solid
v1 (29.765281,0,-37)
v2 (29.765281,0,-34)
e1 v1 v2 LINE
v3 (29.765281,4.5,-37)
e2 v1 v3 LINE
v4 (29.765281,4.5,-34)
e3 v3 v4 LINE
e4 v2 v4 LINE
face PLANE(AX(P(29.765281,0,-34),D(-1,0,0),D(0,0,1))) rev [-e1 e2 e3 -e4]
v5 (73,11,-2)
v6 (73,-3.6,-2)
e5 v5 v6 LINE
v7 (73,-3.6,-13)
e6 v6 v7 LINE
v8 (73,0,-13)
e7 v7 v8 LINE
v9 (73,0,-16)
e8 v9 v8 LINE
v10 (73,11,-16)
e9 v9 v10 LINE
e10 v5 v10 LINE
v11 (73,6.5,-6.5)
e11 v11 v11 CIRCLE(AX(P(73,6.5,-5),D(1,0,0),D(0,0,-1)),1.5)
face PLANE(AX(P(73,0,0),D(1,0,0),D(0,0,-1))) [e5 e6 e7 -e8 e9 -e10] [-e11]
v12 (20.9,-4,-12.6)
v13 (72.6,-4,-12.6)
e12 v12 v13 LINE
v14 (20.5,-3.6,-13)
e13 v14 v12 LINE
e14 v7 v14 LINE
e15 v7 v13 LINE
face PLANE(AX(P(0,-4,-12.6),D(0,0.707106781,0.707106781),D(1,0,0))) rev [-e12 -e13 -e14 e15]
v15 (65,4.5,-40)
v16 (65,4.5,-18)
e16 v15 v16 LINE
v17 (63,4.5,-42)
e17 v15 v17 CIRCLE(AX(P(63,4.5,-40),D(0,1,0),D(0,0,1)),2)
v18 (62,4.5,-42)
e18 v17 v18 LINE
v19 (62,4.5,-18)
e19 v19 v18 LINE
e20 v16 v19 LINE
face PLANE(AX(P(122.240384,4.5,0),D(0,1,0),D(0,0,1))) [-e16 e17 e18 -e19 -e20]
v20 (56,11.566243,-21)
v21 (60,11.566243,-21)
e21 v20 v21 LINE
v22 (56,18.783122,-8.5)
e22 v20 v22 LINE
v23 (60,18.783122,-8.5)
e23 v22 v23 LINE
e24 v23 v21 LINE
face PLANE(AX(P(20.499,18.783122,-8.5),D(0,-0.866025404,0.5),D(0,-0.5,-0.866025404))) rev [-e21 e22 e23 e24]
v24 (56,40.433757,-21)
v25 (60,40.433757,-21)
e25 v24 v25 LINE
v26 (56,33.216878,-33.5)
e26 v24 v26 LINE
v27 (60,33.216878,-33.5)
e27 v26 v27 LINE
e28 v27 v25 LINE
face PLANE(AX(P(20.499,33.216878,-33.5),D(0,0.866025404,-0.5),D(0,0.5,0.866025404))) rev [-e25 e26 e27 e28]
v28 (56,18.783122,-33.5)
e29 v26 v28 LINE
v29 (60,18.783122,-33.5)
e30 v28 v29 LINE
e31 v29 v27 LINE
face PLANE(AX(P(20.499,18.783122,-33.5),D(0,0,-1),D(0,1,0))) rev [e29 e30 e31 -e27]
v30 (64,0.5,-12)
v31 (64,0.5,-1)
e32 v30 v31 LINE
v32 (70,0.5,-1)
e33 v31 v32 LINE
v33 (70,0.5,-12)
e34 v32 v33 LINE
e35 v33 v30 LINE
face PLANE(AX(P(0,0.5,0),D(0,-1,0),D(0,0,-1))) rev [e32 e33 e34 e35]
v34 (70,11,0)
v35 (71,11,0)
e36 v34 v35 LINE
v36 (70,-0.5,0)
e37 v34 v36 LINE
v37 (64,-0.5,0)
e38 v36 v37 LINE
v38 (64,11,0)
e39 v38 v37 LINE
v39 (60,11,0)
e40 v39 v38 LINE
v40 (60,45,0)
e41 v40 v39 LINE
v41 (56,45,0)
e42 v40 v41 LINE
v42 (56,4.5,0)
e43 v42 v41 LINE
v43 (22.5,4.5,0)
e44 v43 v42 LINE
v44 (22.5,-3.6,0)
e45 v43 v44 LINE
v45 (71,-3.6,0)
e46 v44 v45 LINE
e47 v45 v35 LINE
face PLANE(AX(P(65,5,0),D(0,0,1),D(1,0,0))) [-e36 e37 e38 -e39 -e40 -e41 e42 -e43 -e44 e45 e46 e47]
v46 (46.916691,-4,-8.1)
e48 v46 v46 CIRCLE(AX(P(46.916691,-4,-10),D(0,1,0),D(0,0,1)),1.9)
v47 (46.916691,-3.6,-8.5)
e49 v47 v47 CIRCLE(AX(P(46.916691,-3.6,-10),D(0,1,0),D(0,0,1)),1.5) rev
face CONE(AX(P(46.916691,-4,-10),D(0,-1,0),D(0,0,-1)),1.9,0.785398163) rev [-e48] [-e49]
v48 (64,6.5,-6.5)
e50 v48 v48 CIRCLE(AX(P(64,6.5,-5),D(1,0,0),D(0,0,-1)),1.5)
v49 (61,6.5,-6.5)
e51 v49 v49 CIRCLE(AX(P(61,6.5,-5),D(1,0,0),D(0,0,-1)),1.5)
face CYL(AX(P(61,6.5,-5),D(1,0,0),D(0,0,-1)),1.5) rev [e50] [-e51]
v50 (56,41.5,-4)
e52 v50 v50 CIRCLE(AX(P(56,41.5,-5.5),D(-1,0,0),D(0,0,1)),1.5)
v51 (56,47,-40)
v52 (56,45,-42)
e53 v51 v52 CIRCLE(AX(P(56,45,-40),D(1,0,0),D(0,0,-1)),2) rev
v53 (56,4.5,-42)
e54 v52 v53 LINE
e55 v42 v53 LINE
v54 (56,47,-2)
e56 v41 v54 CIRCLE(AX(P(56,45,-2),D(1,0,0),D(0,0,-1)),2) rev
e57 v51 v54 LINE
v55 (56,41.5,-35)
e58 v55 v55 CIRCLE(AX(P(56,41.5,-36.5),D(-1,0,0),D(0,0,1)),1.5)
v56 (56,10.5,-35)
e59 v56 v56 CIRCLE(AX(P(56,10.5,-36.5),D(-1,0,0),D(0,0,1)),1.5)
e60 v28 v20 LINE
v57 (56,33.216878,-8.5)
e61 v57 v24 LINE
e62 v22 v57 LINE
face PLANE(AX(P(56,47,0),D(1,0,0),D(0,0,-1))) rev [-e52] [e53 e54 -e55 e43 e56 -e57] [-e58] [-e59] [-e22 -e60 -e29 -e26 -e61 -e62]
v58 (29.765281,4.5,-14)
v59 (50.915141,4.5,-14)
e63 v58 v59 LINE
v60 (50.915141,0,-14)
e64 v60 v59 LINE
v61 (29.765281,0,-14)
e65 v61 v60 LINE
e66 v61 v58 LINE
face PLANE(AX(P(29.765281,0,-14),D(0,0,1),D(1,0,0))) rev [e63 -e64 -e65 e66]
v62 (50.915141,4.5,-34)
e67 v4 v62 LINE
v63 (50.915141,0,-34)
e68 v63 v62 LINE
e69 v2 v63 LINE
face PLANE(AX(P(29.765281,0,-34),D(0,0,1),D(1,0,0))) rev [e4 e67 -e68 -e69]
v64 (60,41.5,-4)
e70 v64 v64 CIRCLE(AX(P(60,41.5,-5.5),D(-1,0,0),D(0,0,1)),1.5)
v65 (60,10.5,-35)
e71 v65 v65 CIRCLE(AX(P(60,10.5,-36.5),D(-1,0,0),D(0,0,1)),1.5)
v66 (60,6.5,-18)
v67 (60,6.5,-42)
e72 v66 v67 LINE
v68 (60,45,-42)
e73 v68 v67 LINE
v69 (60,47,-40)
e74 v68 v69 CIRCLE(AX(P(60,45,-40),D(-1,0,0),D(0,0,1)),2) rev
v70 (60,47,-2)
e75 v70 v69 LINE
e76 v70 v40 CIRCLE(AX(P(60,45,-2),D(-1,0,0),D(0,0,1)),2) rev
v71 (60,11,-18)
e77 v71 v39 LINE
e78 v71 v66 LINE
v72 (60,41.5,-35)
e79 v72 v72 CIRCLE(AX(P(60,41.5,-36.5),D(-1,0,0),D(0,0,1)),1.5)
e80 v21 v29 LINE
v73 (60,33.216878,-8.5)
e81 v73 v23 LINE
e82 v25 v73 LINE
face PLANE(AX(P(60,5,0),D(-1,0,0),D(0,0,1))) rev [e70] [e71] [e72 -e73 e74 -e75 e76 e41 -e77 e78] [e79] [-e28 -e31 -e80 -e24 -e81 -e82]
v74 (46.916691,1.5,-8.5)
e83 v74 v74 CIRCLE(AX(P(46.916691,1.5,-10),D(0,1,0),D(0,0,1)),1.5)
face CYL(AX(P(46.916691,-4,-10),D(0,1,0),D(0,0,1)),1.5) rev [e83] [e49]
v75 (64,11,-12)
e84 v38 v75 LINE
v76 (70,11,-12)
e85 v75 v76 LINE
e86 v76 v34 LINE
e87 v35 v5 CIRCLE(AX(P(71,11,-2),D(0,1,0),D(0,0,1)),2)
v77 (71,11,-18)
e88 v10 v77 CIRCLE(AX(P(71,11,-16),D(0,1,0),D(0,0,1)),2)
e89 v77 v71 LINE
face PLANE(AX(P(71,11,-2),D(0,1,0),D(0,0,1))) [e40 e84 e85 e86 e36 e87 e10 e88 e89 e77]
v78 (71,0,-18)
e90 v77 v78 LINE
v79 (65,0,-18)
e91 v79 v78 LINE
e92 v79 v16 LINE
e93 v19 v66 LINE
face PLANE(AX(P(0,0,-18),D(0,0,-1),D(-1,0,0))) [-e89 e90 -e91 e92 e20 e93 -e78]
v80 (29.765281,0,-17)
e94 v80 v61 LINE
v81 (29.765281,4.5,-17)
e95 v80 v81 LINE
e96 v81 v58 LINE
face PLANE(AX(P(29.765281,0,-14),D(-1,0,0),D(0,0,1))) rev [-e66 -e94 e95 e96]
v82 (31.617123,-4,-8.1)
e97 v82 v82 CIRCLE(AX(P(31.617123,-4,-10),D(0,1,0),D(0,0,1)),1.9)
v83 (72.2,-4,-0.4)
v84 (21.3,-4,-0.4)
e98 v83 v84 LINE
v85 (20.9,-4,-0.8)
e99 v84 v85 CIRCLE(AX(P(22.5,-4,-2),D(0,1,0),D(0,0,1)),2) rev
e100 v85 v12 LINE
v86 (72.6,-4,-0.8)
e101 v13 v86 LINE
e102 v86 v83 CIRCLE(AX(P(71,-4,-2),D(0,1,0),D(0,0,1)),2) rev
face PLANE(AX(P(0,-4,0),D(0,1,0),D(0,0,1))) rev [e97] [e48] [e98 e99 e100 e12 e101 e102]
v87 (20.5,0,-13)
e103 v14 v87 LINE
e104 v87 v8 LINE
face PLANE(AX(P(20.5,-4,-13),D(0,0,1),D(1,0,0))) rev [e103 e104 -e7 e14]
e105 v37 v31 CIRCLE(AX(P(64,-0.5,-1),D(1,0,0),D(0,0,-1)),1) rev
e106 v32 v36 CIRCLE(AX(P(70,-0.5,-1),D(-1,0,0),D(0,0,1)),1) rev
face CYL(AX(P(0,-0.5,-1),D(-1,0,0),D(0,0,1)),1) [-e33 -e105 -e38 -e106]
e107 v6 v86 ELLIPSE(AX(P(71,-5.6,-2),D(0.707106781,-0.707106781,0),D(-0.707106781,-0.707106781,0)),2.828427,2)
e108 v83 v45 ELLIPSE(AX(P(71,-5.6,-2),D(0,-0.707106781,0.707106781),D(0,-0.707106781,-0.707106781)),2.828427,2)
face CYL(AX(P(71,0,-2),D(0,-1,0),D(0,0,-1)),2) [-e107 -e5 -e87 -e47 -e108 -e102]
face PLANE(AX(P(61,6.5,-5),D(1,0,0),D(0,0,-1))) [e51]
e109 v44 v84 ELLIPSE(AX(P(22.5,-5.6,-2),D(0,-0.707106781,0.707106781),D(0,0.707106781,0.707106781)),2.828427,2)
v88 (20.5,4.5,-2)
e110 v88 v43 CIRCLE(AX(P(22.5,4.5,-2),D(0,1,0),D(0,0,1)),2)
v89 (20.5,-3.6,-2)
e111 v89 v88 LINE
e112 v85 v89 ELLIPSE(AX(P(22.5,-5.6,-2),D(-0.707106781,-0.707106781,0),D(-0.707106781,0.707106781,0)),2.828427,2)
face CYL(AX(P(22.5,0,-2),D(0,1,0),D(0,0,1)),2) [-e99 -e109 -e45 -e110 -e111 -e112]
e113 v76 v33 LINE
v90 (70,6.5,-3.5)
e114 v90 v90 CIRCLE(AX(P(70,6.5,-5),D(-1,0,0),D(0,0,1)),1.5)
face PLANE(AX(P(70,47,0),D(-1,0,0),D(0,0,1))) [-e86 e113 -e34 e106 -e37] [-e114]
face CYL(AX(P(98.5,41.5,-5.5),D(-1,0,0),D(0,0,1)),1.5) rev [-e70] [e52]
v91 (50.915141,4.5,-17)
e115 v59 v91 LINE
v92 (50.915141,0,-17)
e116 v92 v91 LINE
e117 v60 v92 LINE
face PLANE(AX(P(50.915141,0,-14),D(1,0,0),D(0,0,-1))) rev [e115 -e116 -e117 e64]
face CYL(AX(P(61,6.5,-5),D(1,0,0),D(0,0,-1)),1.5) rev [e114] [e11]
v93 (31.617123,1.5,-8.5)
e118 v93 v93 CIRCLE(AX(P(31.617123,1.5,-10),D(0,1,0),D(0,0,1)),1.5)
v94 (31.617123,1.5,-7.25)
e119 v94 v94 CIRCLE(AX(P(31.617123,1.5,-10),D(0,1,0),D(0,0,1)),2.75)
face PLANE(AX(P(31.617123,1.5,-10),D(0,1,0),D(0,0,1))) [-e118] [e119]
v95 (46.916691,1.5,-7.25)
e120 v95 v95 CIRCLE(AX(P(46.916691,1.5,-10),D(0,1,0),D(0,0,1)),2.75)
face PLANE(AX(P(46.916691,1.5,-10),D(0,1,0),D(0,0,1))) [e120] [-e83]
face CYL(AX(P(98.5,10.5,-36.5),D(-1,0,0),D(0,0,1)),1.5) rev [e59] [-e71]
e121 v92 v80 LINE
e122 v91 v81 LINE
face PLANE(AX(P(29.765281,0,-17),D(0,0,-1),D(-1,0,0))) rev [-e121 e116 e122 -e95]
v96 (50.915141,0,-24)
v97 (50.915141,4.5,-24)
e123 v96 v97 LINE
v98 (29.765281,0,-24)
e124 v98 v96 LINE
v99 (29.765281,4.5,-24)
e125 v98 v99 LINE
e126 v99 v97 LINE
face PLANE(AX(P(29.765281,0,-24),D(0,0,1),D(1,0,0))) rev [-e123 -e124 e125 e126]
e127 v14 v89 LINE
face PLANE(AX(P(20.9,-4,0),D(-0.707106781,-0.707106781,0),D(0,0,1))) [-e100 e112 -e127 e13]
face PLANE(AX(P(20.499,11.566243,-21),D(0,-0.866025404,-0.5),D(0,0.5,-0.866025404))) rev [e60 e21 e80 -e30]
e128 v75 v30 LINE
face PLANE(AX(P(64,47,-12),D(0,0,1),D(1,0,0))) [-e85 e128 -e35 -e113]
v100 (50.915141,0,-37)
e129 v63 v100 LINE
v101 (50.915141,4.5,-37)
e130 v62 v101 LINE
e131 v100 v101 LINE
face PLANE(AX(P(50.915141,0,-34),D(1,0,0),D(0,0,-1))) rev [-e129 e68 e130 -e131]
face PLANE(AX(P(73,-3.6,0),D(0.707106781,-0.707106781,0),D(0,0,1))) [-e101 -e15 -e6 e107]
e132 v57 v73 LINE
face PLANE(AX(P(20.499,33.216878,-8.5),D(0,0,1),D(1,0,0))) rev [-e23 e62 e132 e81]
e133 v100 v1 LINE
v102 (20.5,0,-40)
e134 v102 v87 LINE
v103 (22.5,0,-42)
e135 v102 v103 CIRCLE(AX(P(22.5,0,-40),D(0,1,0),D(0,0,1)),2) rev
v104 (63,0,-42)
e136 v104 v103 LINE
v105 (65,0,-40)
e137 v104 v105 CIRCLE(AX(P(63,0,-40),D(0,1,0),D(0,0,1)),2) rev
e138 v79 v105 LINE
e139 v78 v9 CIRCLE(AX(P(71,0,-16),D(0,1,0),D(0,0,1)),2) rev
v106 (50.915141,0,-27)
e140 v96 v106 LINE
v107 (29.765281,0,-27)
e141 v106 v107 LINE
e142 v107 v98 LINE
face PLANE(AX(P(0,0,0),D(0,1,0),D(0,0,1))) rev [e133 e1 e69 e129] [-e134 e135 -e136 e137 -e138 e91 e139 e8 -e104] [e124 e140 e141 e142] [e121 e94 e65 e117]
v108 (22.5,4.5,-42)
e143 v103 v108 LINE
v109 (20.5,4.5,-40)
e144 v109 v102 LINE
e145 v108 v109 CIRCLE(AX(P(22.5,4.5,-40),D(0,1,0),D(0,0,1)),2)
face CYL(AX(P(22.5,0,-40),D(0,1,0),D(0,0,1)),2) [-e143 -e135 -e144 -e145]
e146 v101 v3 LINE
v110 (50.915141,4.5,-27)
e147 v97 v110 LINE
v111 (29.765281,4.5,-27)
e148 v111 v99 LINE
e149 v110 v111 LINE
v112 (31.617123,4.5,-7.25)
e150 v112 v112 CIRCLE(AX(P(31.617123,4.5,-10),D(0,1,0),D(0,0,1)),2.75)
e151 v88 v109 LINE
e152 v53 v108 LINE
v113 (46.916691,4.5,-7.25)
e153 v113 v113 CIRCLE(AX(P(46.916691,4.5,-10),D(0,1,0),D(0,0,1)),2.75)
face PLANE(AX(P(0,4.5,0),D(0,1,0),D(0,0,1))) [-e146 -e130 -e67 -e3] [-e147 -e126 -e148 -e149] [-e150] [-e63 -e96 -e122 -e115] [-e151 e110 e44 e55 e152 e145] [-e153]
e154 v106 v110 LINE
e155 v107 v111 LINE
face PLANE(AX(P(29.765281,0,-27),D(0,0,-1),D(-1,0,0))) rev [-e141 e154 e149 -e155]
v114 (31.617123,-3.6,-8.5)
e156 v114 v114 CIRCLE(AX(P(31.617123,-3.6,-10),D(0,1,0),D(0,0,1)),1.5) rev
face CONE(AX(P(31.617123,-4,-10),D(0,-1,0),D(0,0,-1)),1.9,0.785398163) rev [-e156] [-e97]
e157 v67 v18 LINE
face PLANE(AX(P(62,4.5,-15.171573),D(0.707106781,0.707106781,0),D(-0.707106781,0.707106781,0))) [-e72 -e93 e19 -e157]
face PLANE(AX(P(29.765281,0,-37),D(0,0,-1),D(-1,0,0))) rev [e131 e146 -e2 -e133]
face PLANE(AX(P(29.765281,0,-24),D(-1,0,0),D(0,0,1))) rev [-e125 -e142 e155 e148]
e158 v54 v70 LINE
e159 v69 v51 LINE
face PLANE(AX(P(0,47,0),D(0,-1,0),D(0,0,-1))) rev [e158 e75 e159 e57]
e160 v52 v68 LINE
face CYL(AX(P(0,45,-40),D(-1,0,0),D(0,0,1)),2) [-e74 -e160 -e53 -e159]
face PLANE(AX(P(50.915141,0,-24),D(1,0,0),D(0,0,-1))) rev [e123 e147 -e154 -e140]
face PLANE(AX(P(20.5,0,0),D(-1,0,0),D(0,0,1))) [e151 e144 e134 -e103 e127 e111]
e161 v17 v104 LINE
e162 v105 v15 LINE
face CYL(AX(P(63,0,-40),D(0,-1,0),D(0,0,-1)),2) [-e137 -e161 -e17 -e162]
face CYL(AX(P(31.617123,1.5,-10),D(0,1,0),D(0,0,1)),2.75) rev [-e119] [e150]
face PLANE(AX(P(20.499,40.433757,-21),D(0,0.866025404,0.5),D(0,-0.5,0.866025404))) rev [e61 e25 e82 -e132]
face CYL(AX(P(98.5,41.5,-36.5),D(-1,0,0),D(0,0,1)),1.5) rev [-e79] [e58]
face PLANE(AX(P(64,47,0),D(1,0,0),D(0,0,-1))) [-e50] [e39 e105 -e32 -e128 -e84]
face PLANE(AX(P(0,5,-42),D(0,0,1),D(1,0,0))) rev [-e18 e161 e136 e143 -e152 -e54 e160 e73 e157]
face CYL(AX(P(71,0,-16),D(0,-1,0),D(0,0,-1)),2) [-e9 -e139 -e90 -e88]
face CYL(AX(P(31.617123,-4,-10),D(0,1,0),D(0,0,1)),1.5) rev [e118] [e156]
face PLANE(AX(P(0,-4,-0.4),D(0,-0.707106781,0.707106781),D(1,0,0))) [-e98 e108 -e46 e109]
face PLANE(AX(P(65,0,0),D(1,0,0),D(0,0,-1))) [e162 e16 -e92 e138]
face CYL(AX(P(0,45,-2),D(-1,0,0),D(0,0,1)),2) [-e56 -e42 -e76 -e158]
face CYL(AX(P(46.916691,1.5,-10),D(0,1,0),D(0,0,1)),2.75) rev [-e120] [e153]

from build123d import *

# Parameters (mm, degrees)
EXTRUDE_1_DEPTH           = 5
SKETCH_3_W                = 4
SKETCH_3_H                = 42
EXTRUDE_2_DEPTH           = 42
SKETCH_4_R                = 1.5
CUT_EXTRUDE_1_DEPTH       = 42.5
SKETCH_5_R                = 12.5
CUT_EXTRUDE_2_DEPTH       = 42.5
SKETCH_7_W                = 20
SKETCH_7_H                = 5
EXTRUDE_3_DEPTH           = 5
EXTRUDE_5_DEPTH           = 42
SKETCH_11_W               = 20
SKETCH_11_H               = 5
EXTRUDE_6_DEPTH           = 18
SKETCH_12_W               = 4
SKETCH_12_H               = 20
EXTRUDE_7_DEPTH           = 42
CUT_EXTRUDE_4_REACH       = 106.221
SKETCH_13_R               = 1.6
CUT_EXTRUDE_START         = -22
SKETCH_15_W               = 10
SKETCH_15_H               = 27
CUT_EXTRUDE_5_DEPTH       = 22
SKETCH_16_W               = 5
SKETCH_16_H               = 5
CUT_EXTRUDE_6_DEPTH       = 42
EXTRUDE_START             = -22
SKETCH_17_W               = 10
SKETCH_17_H               = 5
EXTRUDE_8_DEPTH           = 22
CUT_EXTRUDE_7_DEPTH       = 5
CHAMFER_1_SIZE            = 7
EXTRUDE_10_REACH          = 103.064
SKETCH_28_W               = 5
SKETCH_28_H               = 10
SKETCH_29_W               = 10
SKETCH_29_H               = 13
SKETCH_29_W_2             = 33
EXTRUDE_11_DEPTH          = 3
EXTRUDE_12_DEPTH          = 10
EXTRUDE_13_DEPTH          = 10
CUT_EXTRUDE_8_DEPTH       = 10
EXTRUDE_14_REACH          = 91.118
SKETCH_34_R               = 3
CUT_EXTRUDE_9_DEPTH       = 3
SKETCH_35_R               = 1.5
CUT_EXTRUDE_10_DEPTH      = 104.334408597
SKETCH_37_W               = 25
SKETCH_37_H               = 3.734653936
CUT_EXTRUDE_11_DEPTH      = 103.063705596
EXTRUDE_15_DEPTH          = 5
CUT_EXTRUDE_12_DEPTH      = 5
SKETCH_40_W               = 19
SKETCH_40_H               = 5
CUT_EXTRUDE_13_DEPTH      = 42
SKETCH_41_W               = 19
SKETCH_41_H               = 5
CUT_EXTRUDE_14_DEPTH      = 42
EXTRUDE_16_DEPTH          = 5
EXTRUDE_17_DEPTH          = 5
SKETCH_44_R               = 1.6
CUT_EXTRUDE_15_DEPTH      = 97.446876569
CUT_EXTRUDE_16_DEPTH      = 20
EXTRUDE_18_REACH          = 88.155
SKETCH_46_W               = 25
SKETCH_46_H               = 5
SKETCH_48_W               = 46
SKETCH_48_H               = 42
CUT_EXTRUDE_17_DEPTH      = 0.5
SKETCH_49_W               = 42
SKETCH_49_H               = 4.5
CUT_EXTRUDE_18_DEPTH      = 10.5
SKETCH_50_W               = 42
SKETCH_50_H               = 4.5
EXTRUDE_19_DEPTH          = 49.5
SKETCH_52_W               = 21.14986069
SKETCH_52_H               = 3
CUT_EXTRUDE_19_DEPTH      = 93.033961123
SKETCH_53_W               = 49.5
SKETCH_53_H               = 13
EXTRUDE_21_DEPTH          = 4
CUT_EXTRUDE_20_DEPTH      = 5
SKETCH_55_R               = 2.75
CUT_EXTRUDE_21_DEPTH      = 3
SKETCH_56_R               = 1.5
CUT_EXTRUDE_22_DEPTH      = 90.77332566
SKETCH_57_W               = 13
SKETCH_57_H               = 8.5
EXTRUDE_22_DEPTH          = 5
SKETCH_61_W               = 13
SKETCH_61_H               = 8.5
EXTRUDE_25_DEPTH          = 3
SKETCH_64_W               = 8
SKETCH_64_H               = 4.5
EXTRUDE_26_DEPTH          = 5
EXTRUDE_27_DEPTH          = 5
CUT_EXTRUDE_23_DEPTH      = 95.335836245
CUT_EXTRUDE_23_DEPTH_BACK = 4
SKETCH_62_W               = 6
SKETCH_62_H               = 12
FILLET_2_R                = 1
SKETCH_63_R               = 1.5
CUT_EXTRUDE_24_DEPTH      = 12
SKETCH_66_R               = 1.5
EXTRUDE_28_DEPTH          = 4
CHAMFER_2_SIZE            = 0.4
FILLET_3_R                = 2
EXTRUDE_29_DEPTH          = 24
FILLET_4_R                = 2
CUT_EXTRUDE_START_2       = -4.000001
CUT_EXTRUDE_25_DEPTH      = 4.000002
EXTRUDE_30_DEPTH          = 1.5


# Some blends are built 0.0001 mm under size
with BuildPart() as part:
    # 草图1 → 凸台-拉伸1 (new body)
    with BuildSketch(Plane(origin=(0, 0, 0), x_dir=(1, 0, 0), z_dir=(0, 1, 0))):
        Polygon((10, 0), (50, 0), (50, -20), (60, -20), (60, 0), (60, 42), (0, 42), (0, 0), (0, -20), (10, -20), align=None)
    extrude(amount=EXTRUDE_1_DEPTH)

    # 草图3 → 凸台-拉伸2 (add)
    with BuildSketch(Plane(origin=(0, 5, 0), x_dir=(1, 0, 0), z_dir=(0, 1, 0))):
        with Locations((58, 21)):
            Rectangle(SKETCH_3_W, SKETCH_3_H)
    extrude(amount=EXTRUDE_2_DEPTH)

    # 草图4 → 切除-拉伸1 (cut)
    with BuildSketch(Plane.ZY.offset(-56)):
        with Locations((-36.5, 41.5)):
            Circle(SKETCH_4_R)
        with Locations((-5.5, 41.5)):
            Circle(SKETCH_4_R)
        with Locations((-5.5, 10.5)):
            Circle(SKETCH_4_R)
        with Locations((-36.5, 10.5)):
            Circle(SKETCH_4_R)
    extrude(amount=-CUT_EXTRUDE_1_DEPTH, mode=Mode.SUBTRACT)

    # 草图5 → 切除-拉伸2 (cut)
    with BuildSketch(Plane.ZY.offset(-56)):
        with Locations((-21, 26)):
            Circle(SKETCH_5_R)
    extrude(amount=-CUT_EXTRUDE_2_DEPTH, mode=Mode.SUBTRACT)

    # 草图7 → 凸台-拉伸3 (add)
    with BuildSketch(Plane(origin=(60, 0, 0), x_dir=(0, 0, -1), z_dir=(1, 0, 0))):
        with Locations((-10, 2.5)):
            Rectangle(SKETCH_7_W, SKETCH_7_H)
    extrude(amount=EXTRUDE_3_DEPTH)

    # 草图8 → 凸台-拉伸5 (add)
    with BuildSketch(Plane(origin=(0, 5, 0), x_dir=(1, 0, 0), z_dir=(0, 1, 0))):
        Polygon((65, 0), (56, 0), (56, -5), (61, -5), (61, -15), (56, -15), (56, -20), (65, -20), align=None)
    extrude(amount=EXTRUDE_5_DEPTH)

    # 草图11 → 凸台-拉伸6 (add)
    with BuildSketch(Plane(origin=(65, 0, 0), x_dir=(0, 0, -1), z_dir=(1, 0, 0))):
        with Locations((-10, 2.5)):
            Rectangle(SKETCH_11_W, SKETCH_11_H)
    extrude(amount=EXTRUDE_6_DEPTH)

    # 草图12 → 凸台-拉伸7 (add)
    with BuildSketch(Plane(origin=(0, 5, 0), x_dir=(1, 0, 0), z_dir=(0, 1, 0))):
        with Locations((81, -10)):
            Rectangle(SKETCH_12_W, SKETCH_12_H)
    extrude(amount=EXTRUDE_7_DEPTH)

    # 切除-拉伸4: up to this face of the body (flat: up to its plane)
    cut_extrude_4_end = Plane(part.part.faces().sort_by_distance((61, 26, 10))[0])
    # 草图13 → 切除-拉伸4 (cut, up to the picked face)
    with BuildSketch(Plane(origin=(83, 0, 0), x_dir=(0, 0, -1), z_dir=(1, 0, 0)), mode=Mode.PRIVATE) as cut_extrude_4_sk1:
        with Locations((-10, 37)):
            Circle(SKETCH_13_R)
    cut_extrude_4_tool1 = split(extrude(cut_extrude_4_sk1.sketch, amount=-CUT_EXTRUDE_4_REACH, mode=Mode.PRIVATE), bisect_by=cut_extrude_4_end, keep=Keep.BOTH, mode=Mode.PRIVATE)
    add(cut_extrude_4_tool1.solids().sort_by(Axis((83, 37, 10), (-1, 0, 0)))[0], mode=Mode.SUBTRACT)

    # 草图15 → 切除-拉伸5 (cut)
    with BuildSketch(Plane.ZY.offset(-61).offset(CUT_EXTRUDE_START)):
        with Locations((10, 18.5)):
            Rectangle(SKETCH_15_W, SKETCH_15_H)
    extrude(amount=CUT_EXTRUDE_5_DEPTH, mode=Mode.SUBTRACT)

    # 草图16 → 切除-拉伸6 (cut)
    with BuildSketch(Plane(origin=(0, 47, 0), x_dir=(1, 0, 0), z_dir=(0, 1, 0))):
        with Locations((58.5, -17.5)):
            Rectangle(SKETCH_16_W, SKETCH_16_H)
    extrude(amount=-CUT_EXTRUDE_6_DEPTH, mode=Mode.SUBTRACT)

    # 草图17 → 凸台-拉伸8 (add)
    with BuildSketch(Plane.ZY.offset(-61).offset(EXTRUDE_START)):
        with Locations((10, 7.5)):
            Rectangle(SKETCH_17_W, SKETCH_17_H)
    extrude(amount=EXTRUDE_8_DEPTH)

    # 草图19 → 切除-拉伸7 (cut)
    with BuildSketch(Plane(origin=(0, 10, 0), x_dir=(1, 0, 0), z_dir=(0, 1, 0))):
        Polygon((79, -15), (83, -15), (83, -5), (79, -5), (65, -5), (61, -5), (61, -15), (65, -15), align=None)
    extrude(amount=-CUT_EXTRUDE_7_DEPTH, mode=Mode.SUBTRACT)

    # 倒角1
    chamfer_1_edges = [part.edges().sort_by_distance(p)[0] for p in [
        (79, 5, 2.5),
        (65, 5, 2.5),
    ]]
    chamfer(chamfer_1_edges, length=CHAMFER_1_SIZE - 0.0001)  # a hair under: the kernel refuses the full size

    # 草图28 → 凸台-拉伸10 (add, up to next)
    with BuildSketch(Plane.ZY.offset(-79), mode=Mode.PRIVATE) as extrude_10_sk1:
        with Locations((17.5, 19)):
            Rectangle(SKETCH_28_W, SKETCH_28_H)
    extrude_10_tool1 = extrude(extrude_10_sk1.sketch, amount=EXTRUDE_10_REACH, mode=Mode.PRIVATE) - part.part
    add(extrude_10_tool1.solids().sort_by_distance((79, 19, 17.5))[0])

    # 草图29 → 凸台-拉伸11 (add)
    with BuildSketch(Plane(origin=(0, 0, 0), x_dir=(-1, 0, 0), z_dir=(0, -1, 0))):
        with Locations((-5, -13.5)):
            Rectangle(SKETCH_29_W, SKETCH_29_H)
        with Locations((-66.5, -13.5)):
            Rectangle(SKETCH_29_W_2, SKETCH_29_H)
    extrude(amount=EXTRUDE_11_DEPTH)

    # 草图30 → 凸台-拉伸12 (add)
    with BuildSketch(Plane(origin=(10, 0, 0), x_dir=(0, 0, -1), z_dir=(1, 0, 0))):
        Polygon((-20, 5), (-20, -3), (-7, -3), (-7, 0), (0, 0), (0, 5), align=None)
    extrude(amount=EXTRUDE_12_DEPTH)

    # 草图31 → 凸台-拉伸13 (add)
    with BuildSketch(Plane.ZY.offset(-50)):
        Polygon((0, 0), (7, 0), (7, -3), (20, -3), (20, 5), (0, 5), align=None)
    extrude(amount=EXTRUDE_13_DEPTH)

    # 草图32 → 切除-拉伸8 (cut)
    with BuildSketch(Plane.ZY):
        Polygon((-42, 0), (7, 0), (7, -3), (20, -3), (20, 5), (-42, 5), align=None)
    extrude(amount=-CUT_EXTRUDE_8_DEPTH, mode=Mode.SUBTRACT)

    # 草图33 → 凸台-拉伸14 (add, up to next)
    with BuildSketch(Plane(origin=(20, 0, 0), x_dir=(0, 0, -1), z_dir=(1, 0, 0)), mode=Mode.PRIVATE) as extrude_14_sk1:
        Polygon((0, 5), (-20, 5), (-20, -3), (-7, -3), (-7, 0), (0, 0), align=None)
    extrude_14_tool1 = extrude(extrude_14_sk1.sketch, amount=EXTRUDE_14_REACH, mode=Mode.PRIVATE) - part.part
    add(extrude_14_tool1.solids().sort_by_distance((20, 1.377698, 10.982014))[0])

    # 草图34 → 切除-拉伸9 (cut)
    with BuildSketch(Plane(origin=(0, 5, 0), x_dir=(1, 0, 0), z_dir=(0, 1, 0))):
        with Locations(Location((19.284781786, -10, 0), (0, 0, 270))):
            Circle(SKETCH_34_R)
        with Locations(Location((51.101803391, -10, 0), (0, 0, 270))):
            Circle(SKETCH_34_R)
    extrude(amount=-CUT_EXTRUDE_9_DEPTH, mode=Mode.SUBTRACT)

    # 草图35 → 切除-拉伸10 (cut, through all)
    with BuildSketch(Plane(origin=(0, 2, 0), x_dir=(1, 0, 0), z_dir=(0, 1, 0))):
        with Locations(Location((19.284781786, -10, 0), (0, 0, 270))):
            Circle(SKETCH_35_R)
        with Locations(Location((51.101803391, -10, 0), (0, 0, 270))):
            Circle(SKETCH_35_R)
    extrude(amount=-CUT_EXTRUDE_10_DEPTH, mode=Mode.SUBTRACT)

    # 草图37 → 切除-拉伸11 (cut, through all)
    with BuildSketch(Plane(origin=(0, 5, 0), x_dir=(1, 0, 0), z_dir=(0, 1, 0))):
        with Locations((35.5, 33.696781352)):
            Rectangle(SKETCH_37_W, SKETCH_37_H)
        with Locations((35.5, 23.696781352)):
            Rectangle(SKETCH_37_W, SKETCH_37_H)
        with Locations((35.5, 13.696781352)):
            Rectangle(SKETCH_37_W, SKETCH_37_H)
        with Locations((35.5, 3.696781352)):
            Rectangle(SKETCH_37_W, SKETCH_37_H)
    extrude(amount=-CUT_EXTRUDE_11_DEPTH, mode=Mode.SUBTRACT)

    # 草图38 → 凸台-拉伸15 (add)
    with BuildSketch(Plane.ZY.offset(-61)):
        Polygon((15, 32), (15, 5), (20, 5), (20, 47), (5, 47), (5, 32), align=None)
    extrude(amount=EXTRUDE_15_DEPTH)

    # 草图39 → 切除-拉伸12 (cut)
    with BuildSketch(Plane(origin=(65, 0, 0), x_dir=(0, 0, -1), z_dir=(1, 0, 0))):
        Polygon((-20, 47), (-20, 24), (-15, 24), (-15, 32), (-5, 32), (-5, 12), (0, 12), (0, 47), align=None)
    extrude(amount=-CUT_EXTRUDE_12_DEPTH, mode=Mode.SUBTRACT)

    # 草图40 → 切除-拉伸13 (cut)
    with BuildSketch(Plane(origin=(0, 47, 0), x_dir=(1, 0, 0), z_dir=(0, 1, 0))):
        with Locations((69.5, -2.5)):
            Rectangle(SKETCH_40_W, SKETCH_40_H)
    extrude(amount=-CUT_EXTRUDE_13_DEPTH, mode=Mode.SUBTRACT)

    # 草图41 → 切除-拉伸14 (cut)
    with BuildSketch(Plane(origin=(0, 47, 0), x_dir=(1, 0, 0), z_dir=(0, 1, 0))):
        with Locations((69.5, -17.5)):
            Rectangle(SKETCH_41_W, SKETCH_41_H)
    extrude(amount=-CUT_EXTRUDE_14_DEPTH, mode=Mode.SUBTRACT)

    # 草图42 → 凸台-拉伸16 (add)
    with BuildSketch(Plane.XY.offset(20)):
        Polygon((60, 20), (60, 5), (69.5, 12.5), align=None)
        Polygon((60, 5), (69.5, 5), (79, 5), (69.5, 12.5), align=None)
        Polygon((69.5, 12.5), (79, 5), (79, 20), align=None)
    extrude(amount=-EXTRUDE_16_DEPTH)

    # 草图43 → 凸台-拉伸17 (add)
    with BuildSketch(Plane(origin=(0, 0, 0), x_dir=(-1, 0, 0), z_dir=(0, 0, -1))):
        Polygon((-69.5, 12.5), (-60, 5), (-60, 20), align=None)
        Polygon((-69.5, 12.5), (-79, 5), (-60, 5), align=None)
        Polygon((-79, 20), (-79, 5), (-69.5, 12.5), align=None)
    extrude(amount=-EXTRUDE_17_DEPTH)

    # 草图44 → 切除-拉伸15 (cut, through all)
    with BuildSketch(Plane(origin=(83, 0, 0), x_dir=(0, 0, -1), z_dir=(1, 0, 0))):
        with Locations((-10, 37)):
            Circle(SKETCH_44_R)
    extrude(amount=-CUT_EXTRUDE_15_DEPTH, mode=Mode.SUBTRACT)

    # 草图45 → 切除-拉伸16 (cut)
    with BuildSketch(Plane.XY.offset(20)):
        Polygon((69.5, 12.5), (60, 20), (60, 47), (56, 47), (56, 5), (10, 5), (10, -3), (83, -3), (83, 47), (79, 47), (79, 20), align=None)
    extrude(amount=-CUT_EXTRUDE_16_DEPTH, mode=Mode.SUBTRACT)

    # 草图46 → 凸台-拉伸18 (add, up to next)
    with BuildSketch(Plane(origin=(0, 0, -1.829454384), x_dir=(-1, 0, 0), z_dir=(0, 0, -1)), mode=Mode.PRIVATE) as extrude_18_sk1:
        with Locations((-35.5, 2.5)):
            Rectangle(SKETCH_46_W, SKETCH_46_H)
    extrude_18_tool1 = extrude(extrude_18_sk1.sketch, amount=EXTRUDE_18_REACH, mode=Mode.PRIVATE) - part.part
    add(extrude_18_tool1.solids().sort_by_distance((35.5, 2.5, -1.829454))[0])

    # 草图48 → 切除-拉伸17 (cut)
    with BuildSketch(Plane(origin=(0, 5, 0), x_dir=(1, 0, 0), z_dir=(0, 1, 0))):
        with Locations((33, 21)):
            Rectangle(SKETCH_48_W, SKETCH_48_H)
    extrude(amount=-CUT_EXTRUDE_17_DEPTH, mode=Mode.SUBTRACT)

    # 草图49 → 切除-拉伸18 (cut)
    with BuildSketch(Plane.ZY.offset(-10)):
        with Locations((-21, 2.25)):
            Rectangle(SKETCH_49_W, SKETCH_49_H)
    extrude(amount=-CUT_EXTRUDE_18_DEPTH, mode=Mode.SUBTRACT)

    # 草图50 → 凸台-拉伸19 (add)
    with BuildSketch(Plane.ZY.offset(-20.5)):
        with Locations((-21, 2.25)):
            Rectangle(SKETCH_50_W, SKETCH_50_H)
    extrude(amount=-EXTRUDE_19_DEPTH)

    # 草图52 → 切除-拉伸19 (cut, through all)
    with BuildSketch(Plane(origin=(0, 4.5, 0), x_dir=(1, 0, 0), z_dir=(0, 1, 0))):
        with Locations((40.340210911, 25.5)):
            Rectangle(SKETCH_52_W, SKETCH_52_H)
        with Locations((40.340210911, 35.5)):
            Rectangle(SKETCH_52_W, SKETCH_52_H)
        with Locations((40.340210911, 15.5)):
            Rectangle(SKETCH_52_W, SKETCH_52_H)
    extrude(amount=-CUT_EXTRUDE_19_DEPTH, mode=Mode.SUBTRACT)

    # 草图53 → 凸台-拉伸21 (add)
    with BuildSketch(Plane(origin=(0, 0, 0), x_dir=(-1, 0, 0), z_dir=(0, -1, 0))):
        with Locations((-45.25, 6.5)):
            Rectangle(SKETCH_53_W, SKETCH_53_H)
    extrude(amount=EXTRUDE_21_DEPTH)

    # 草图54 → 切除-拉伸20 (cut)
    with BuildSketch(Plane(origin=(70, 0, 0), x_dir=(0, 0, -1), z_dir=(1, 0, 0))):
        Polygon((42, 0), (42, 4.5), (0, 4.5), (0, -4), (13, -4), (13, 0), align=None)
    extrude(amount=-CUT_EXTRUDE_20_DEPTH, mode=Mode.SUBTRACT)

    # 草图55 → 切除-拉伸21 (cut)
    with BuildSketch(Plane(origin=(0, 4.5, 0), x_dir=(1, 0, 0), z_dir=(0, 1, 0))):
        with Locations(Location((31.617123072, 10, 0), (0, 0, 270))):
            Circle(SKETCH_55_R)
        with Locations(Location((46.91669078, 10, 0), (0, 0, 270))):
            Circle(SKETCH_55_R)
    extrude(amount=-CUT_EXTRUDE_21_DEPTH, mode=Mode.SUBTRACT)

    # 草图56 → 切除-拉伸22 (cut, through all)
    with BuildSketch(Plane(origin=(0, 1.5, 0), x_dir=(1, 0, 0), z_dir=(0, 1, 0))):
        with Locations(Location((31.617123072, 10, 0), (0, 0, 270))):
            Circle(SKETCH_56_R)
        with Locations(Location((46.91669078, 10, 0), (0, 0, 270))):
            Circle(SKETCH_56_R)
    extrude(amount=-CUT_EXTRUDE_22_DEPTH, mode=Mode.SUBTRACT)

    # 草图57 → 凸台-拉伸22 (add)
    with BuildSketch(Plane(origin=(65, 0, 0), x_dir=(0, 0, -1), z_dir=(1, 0, 0))):
        with Locations((6.5, 0.25)):
            Rectangle(SKETCH_57_W, SKETCH_57_H)
    extrude(amount=EXTRUDE_22_DEPTH)

    # 草图61 → 凸台-拉伸25 (add)
    with BuildSketch(Plane(origin=(70, 0, 0), x_dir=(0, 0, -1), z_dir=(1, 0, 0))):
        with Locations((6.5, 0.25)):
            Rectangle(SKETCH_61_W, SKETCH_61_H)
    extrude(amount=EXTRUDE_25_DEPTH)

    # 草图64 → 凸台-拉伸26 (add)
    with BuildSketch(Plane(origin=(0, 0, -13), x_dir=(-1, 0, 0), z_dir=(0, 0, -1))):
        with Locations((-69, 2.25)):
            Rectangle(SKETCH_64_W, SKETCH_64_H)
    extrude(amount=EXTRUDE_26_DEPTH)

    # 草图65 → 凸台-拉伸27 (add)
    with BuildSketch(Plane(origin=(0, 4.5, 0), x_dir=(1, 0, 0), z_dir=(0, 1, 0))):
        Polygon((73, 18), (65, 18), (60, 18), (60, 0), (73, 0), align=None)
    extrude(amount=EXTRUDE_27_DEPTH)

    # 草图62 → 切除-拉伸23 (cut, two sides: drawn at the far end of the back side and taken through both)
    with BuildSketch(Plane(origin=(0, 4.5, 0), x_dir=(1, 0, 0), z_dir=(0, 1, 0)).offset(-CUT_EXTRUDE_23_DEPTH_BACK)):
        with Locations((67, 6)):
            Rectangle(SKETCH_62_W, SKETCH_62_H)
    extrude(amount=CUT_EXTRUDE_23_DEPTH + CUT_EXTRUDE_23_DEPTH_BACK, mode=Mode.SUBTRACT)

    # 圆角2
    fillet_2_edges = [part.edges().sort_by_distance(p)[0] for p in [
        (67, 0.5, 0),
    ]]
    fillet(fillet_2_edges, radius=FILLET_2_R)

    # 草图63 → 切除-拉伸24 (cut)
    with BuildSketch(Plane(origin=(73, 0, 0), x_dir=(0, 0, -1), z_dir=(1, 0, 0))):
        with Locations((5, 6.5)):
            Circle(SKETCH_63_R)
    extrude(amount=-CUT_EXTRUDE_24_DEPTH, mode=Mode.SUBTRACT)

    # 草图66 → 凸台-拉伸28 (add)
    with BuildSketch(Plane.ZY.offset(-56)):
        with Locations((-5.5, 10.5)):
            Circle(SKETCH_66_R)
    extrude(amount=-EXTRUDE_28_DEPTH)

    # 倒角2
    chamfer_2_edges = [part.edges().sort_by_distance(p)[0] for p in [
        (20.5, -4, -6.5),
        (46.75, -4, -13),
        (46.75, -4, 0),
        (31.617123072, -4, -11.5),
        (46.91669078, -4, -11.5),
        (73, -4, -6.5),
    ]]
    chamfer(chamfer_2_edges, length=CHAMFER_2_SIZE)

    # 圆角3
    fillet_3_edges = [part.edges().sort_by_distance(p)[0] for p in [
        (58, 47, -42),
        (58, 47, 0),
        (20.5, 2.25, -42),
        (65, 2.25, -42),
    ]]
    fillet(fillet_3_edges, radius=FILLET_3_R)

    # 草图67 → 凸台-拉伸29 (add)
    with BuildSketch(Plane(origin=(0, 0, -42), x_dir=(-1, 0, 0), z_dir=(0, 0, -1))):
        Polygon((-60, 6.5), (-60, 4.5), (-62, 4.5), align=None)
    extrude(amount=-EXTRUDE_29_DEPTH)

    # 圆角4
    # the kernel refuses this fillet: 2 mm, written as the material it takes off along each edge
    with BuildSketch(Plane(origin=(73, -5, -18), x_dir=(0, 0, 1), z_dir=(0, 1, 0))) as fillet_4_piece_1:
        with BuildLine():
            CenterArc((FILLET_4_R, -FILLET_4_R), FILLET_4_R, 90, 90)
            Line((0, -FILLET_4_R), (0, 0))
            Line((0, 0), (FILLET_4_R, 0))
        make_face()
    extrude(amount=19.5, mode=Mode.SUBTRACT)
    with BuildSketch(Plane(origin=(73, -8.6, 0), x_dir=(-1, 0, 0), z_dir=(0, 1, 0))) as fillet_4_piece_2:
        with BuildLine():
            CenterArc((FILLET_4_R, -FILLET_4_R), FILLET_4_R, 90, 90)
            Line((0, -FILLET_4_R), (0, 0))
            Line((0, 0), (FILLET_4_R, 0))
        make_face()
    extrude(amount=23.1, mode=Mode.SUBTRACT)
    with BuildSketch(Plane(origin=(20.5, 9.5, 0), x_dir=(1, 0, 0), z_dir=(0, -1, 0))) as fillet_4_piece_3:
        with BuildLine():
            CenterArc((FILLET_4_R, -FILLET_4_R), FILLET_4_R, 90, 90)
            Line((0, -FILLET_4_R), (0, 0))
            Line((0, 0), (FILLET_4_R, 0))
        make_face()
    extrude(amount=18.1, mode=Mode.SUBTRACT)

    # 草图68 → 切除-拉伸25 (cut)
    with BuildSketch(Plane(origin=(60, 0, 0), x_dir=(0, 0, -1), z_dir=(1, 0, 0)).offset(CUT_EXTRUDE_START_2)):
        Polygon((21, 40.43375673), (8.5, 33.216878365), (8.5, 18.783121635), (21, 11.56624327), (33.5, 18.783121635), (33.5, 33.216878365), align=None)
    extrude(amount=CUT_EXTRUDE_25_DEPTH, mode=Mode.SUBTRACT)

    # 草图69 → 凸台-拉伸30 (add)
    with BuildSketch(Plane(origin=(0, 9.5, 0), x_dir=(1, 0, 0), z_dir=(0, 1, 0))):
        with BuildLine():
            Line((73, 2), (73, 16))
            ThreePointArc((73, 16), (72.414213562, 17.414213562), (71, 18))
            Line((71, 18), (60, 18))
            Line((60, 18), (60, 0))
            Line((60, 0), (64, 0))
            Line((64, 0), (64, 12))
            Line((64, 12), (70, 12))
            Line((70, 12), (70, 0))
            Line((70, 0), (71, 0))
            ThreePointArc((71, 0), (72.414213562, 0.585786438), (73, 2))
        make_face()
    extrude(amount=EXTRUDE_30_DEPTH)


solid = part.part
